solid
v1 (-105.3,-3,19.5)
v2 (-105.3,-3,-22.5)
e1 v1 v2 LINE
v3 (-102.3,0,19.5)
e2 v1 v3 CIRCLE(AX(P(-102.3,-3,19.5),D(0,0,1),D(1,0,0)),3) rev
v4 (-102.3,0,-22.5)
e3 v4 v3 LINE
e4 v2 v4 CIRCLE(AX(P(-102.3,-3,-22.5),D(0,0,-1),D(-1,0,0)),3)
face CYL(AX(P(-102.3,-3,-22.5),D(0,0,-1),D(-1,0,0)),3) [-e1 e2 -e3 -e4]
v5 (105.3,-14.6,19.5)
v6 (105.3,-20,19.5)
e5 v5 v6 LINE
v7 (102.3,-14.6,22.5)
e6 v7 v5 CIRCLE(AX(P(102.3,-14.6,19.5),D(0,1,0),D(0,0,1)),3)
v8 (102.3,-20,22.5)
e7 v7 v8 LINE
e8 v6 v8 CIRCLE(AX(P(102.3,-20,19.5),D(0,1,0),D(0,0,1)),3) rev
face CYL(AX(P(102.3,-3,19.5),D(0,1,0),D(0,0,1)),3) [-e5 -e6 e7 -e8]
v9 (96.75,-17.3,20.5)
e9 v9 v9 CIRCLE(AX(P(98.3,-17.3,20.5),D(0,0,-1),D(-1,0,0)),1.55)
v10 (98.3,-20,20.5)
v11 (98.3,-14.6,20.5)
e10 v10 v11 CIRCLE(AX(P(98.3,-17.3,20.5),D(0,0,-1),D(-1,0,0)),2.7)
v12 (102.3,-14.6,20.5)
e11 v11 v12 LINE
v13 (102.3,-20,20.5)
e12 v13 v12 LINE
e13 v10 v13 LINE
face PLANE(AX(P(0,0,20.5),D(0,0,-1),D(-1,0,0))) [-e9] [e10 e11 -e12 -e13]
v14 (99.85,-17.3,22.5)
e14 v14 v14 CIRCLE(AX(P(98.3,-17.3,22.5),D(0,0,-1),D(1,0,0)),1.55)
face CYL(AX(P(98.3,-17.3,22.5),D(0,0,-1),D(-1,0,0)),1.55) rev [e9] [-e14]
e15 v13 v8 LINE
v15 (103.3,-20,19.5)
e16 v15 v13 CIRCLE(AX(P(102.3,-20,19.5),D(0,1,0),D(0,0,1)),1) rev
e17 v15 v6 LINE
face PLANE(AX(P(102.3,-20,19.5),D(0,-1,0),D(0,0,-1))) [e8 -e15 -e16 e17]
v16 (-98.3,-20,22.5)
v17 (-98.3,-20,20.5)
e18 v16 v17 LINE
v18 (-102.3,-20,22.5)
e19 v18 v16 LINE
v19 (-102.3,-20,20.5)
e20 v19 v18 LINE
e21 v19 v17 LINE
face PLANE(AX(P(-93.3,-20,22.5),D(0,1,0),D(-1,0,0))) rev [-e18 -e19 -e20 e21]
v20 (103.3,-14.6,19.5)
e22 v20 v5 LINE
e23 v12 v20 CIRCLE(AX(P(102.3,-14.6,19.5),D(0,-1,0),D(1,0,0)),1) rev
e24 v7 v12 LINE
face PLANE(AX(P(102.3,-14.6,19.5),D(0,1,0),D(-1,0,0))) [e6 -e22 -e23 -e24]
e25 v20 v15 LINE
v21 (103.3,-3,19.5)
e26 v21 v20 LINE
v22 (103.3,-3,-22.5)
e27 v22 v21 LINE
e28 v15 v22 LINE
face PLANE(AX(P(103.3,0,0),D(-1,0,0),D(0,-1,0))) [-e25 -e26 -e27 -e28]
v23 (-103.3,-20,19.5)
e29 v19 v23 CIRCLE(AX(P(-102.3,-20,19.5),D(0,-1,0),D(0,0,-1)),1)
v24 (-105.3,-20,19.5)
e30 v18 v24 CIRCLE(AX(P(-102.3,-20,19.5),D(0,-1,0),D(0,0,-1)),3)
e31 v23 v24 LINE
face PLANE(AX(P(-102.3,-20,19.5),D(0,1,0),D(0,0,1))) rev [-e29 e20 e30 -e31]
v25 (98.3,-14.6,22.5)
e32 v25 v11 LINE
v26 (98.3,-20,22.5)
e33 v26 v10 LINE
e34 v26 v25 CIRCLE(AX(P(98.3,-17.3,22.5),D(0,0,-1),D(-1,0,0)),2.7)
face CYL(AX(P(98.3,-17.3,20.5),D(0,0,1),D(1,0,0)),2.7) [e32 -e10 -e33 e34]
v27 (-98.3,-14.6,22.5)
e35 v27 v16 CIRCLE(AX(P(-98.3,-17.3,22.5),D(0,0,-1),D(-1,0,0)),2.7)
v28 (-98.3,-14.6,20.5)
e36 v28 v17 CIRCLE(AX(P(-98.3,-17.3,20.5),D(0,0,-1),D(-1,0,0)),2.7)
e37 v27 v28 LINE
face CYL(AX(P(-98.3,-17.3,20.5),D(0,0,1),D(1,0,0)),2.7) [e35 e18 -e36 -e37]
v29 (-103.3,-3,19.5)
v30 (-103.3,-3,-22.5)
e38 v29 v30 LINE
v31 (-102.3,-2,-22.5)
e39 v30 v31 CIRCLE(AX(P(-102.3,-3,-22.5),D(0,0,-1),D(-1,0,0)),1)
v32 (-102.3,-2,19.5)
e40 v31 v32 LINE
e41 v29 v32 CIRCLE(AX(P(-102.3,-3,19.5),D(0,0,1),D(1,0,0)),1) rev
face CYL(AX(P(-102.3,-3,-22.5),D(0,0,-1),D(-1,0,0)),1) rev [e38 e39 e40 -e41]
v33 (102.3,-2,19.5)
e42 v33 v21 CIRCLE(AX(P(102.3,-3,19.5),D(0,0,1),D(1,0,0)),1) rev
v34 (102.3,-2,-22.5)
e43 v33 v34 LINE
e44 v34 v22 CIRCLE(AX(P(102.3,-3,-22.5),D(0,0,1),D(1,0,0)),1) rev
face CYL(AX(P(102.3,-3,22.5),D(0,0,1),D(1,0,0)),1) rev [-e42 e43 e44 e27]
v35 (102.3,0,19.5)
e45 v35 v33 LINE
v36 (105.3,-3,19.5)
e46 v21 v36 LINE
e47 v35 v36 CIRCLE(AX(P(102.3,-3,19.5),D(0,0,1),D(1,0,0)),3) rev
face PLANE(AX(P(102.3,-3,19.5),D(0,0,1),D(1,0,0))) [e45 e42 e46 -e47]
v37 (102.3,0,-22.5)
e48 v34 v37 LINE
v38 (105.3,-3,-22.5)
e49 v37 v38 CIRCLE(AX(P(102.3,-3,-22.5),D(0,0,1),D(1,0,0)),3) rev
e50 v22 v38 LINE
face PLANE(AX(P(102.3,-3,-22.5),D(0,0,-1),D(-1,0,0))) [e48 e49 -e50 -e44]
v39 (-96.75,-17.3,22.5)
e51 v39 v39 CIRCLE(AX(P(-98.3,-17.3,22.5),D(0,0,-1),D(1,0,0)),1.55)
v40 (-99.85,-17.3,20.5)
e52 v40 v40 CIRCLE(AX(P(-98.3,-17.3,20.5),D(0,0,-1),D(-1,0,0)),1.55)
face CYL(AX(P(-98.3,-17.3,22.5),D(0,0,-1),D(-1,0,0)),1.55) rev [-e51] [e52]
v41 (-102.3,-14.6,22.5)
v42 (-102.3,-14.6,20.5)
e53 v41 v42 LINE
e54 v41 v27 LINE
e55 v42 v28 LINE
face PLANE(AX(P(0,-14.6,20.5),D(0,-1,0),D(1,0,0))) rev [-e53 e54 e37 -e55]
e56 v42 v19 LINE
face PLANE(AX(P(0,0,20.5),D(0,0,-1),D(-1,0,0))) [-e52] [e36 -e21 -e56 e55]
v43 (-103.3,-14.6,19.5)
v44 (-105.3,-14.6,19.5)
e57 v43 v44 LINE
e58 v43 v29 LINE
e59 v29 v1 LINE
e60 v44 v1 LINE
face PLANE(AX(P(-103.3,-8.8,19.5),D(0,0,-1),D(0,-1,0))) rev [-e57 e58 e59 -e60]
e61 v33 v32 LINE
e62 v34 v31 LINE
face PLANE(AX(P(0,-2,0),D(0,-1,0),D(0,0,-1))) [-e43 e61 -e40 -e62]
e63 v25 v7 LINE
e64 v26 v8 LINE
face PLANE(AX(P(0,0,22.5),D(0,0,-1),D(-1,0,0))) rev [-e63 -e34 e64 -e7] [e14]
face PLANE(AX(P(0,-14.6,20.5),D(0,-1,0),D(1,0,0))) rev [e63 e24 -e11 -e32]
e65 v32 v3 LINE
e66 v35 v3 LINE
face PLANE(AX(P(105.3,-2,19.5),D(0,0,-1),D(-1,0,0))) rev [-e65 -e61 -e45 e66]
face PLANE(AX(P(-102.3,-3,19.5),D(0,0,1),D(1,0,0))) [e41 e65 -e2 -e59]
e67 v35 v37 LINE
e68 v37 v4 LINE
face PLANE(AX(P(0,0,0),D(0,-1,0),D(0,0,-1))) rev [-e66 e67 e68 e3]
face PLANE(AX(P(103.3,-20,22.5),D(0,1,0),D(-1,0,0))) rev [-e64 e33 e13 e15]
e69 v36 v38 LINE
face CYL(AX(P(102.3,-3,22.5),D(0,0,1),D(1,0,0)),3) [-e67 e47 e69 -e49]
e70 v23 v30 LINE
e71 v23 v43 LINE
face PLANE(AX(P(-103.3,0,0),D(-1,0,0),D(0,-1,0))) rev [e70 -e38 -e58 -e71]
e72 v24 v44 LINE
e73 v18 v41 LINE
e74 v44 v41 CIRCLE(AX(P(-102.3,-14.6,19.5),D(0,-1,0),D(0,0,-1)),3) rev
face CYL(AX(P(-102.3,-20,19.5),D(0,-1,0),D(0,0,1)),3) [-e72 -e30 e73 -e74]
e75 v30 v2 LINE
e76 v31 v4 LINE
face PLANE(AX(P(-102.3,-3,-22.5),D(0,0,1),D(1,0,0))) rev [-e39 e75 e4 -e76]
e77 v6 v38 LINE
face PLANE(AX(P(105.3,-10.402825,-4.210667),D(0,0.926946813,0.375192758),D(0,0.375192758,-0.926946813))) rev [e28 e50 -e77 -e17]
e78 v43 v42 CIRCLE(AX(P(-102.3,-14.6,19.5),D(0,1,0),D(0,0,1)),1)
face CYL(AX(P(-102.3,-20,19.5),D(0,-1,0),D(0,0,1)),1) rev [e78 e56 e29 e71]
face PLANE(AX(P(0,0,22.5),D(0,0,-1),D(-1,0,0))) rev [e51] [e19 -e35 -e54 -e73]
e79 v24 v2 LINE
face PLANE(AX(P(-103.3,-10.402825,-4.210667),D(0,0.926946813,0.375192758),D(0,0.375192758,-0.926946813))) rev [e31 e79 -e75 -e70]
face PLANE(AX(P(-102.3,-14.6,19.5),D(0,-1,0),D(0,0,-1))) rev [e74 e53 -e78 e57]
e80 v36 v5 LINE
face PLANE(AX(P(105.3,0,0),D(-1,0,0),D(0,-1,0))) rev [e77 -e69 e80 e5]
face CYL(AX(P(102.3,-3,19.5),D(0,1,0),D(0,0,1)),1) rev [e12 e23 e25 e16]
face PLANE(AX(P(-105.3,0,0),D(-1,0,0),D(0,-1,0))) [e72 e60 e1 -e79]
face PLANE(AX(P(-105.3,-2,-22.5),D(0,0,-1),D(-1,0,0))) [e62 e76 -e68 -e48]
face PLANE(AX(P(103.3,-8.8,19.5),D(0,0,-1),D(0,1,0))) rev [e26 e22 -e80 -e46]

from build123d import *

# Parameters (mm, degrees)
SKETCH1_W                          = 210.6
SKETCH1_H                          = 45
BASE_FLANGE1_DEPTH                 = 2
SM_EDGE_FLANGE_1_STRIP_W           = 10
SM_EDGE_FLANGE_1_STRIP_H           = 2
SM_EDGE_FLANGE_1_STRIP_CUT_DEPTH   = 45
SM_EDGE_FLANGE_1_STRIP_2_W         = 10
SM_EDGE_FLANGE_1_STRIP_2_H         = 2
SM_EDGE_FLANGE_1_STRIP_CUT_2_DEPTH = 45
SM_EDGE_FLANGE_1_DEPTH             = 45
SM_EDGE_FLANGE_1_BEND_DEPTH        = 45
SM_START                           = -20
SM_EDGE_FLANGE_2_DEPTH             = 20
SM_START_2                         = -3
SM_EDGE_FLANGE_2_2_DEPTH           = 3
SM_EDGE_FLANGE_2_3_DEPTH           = 17
SKETCH18_R                         = 1.55
CUT_EXTRUDE4_DEPTH                 = 10
CUT_EXTRUDE5_DEPTH                 = 213.740710726
CUT_EXTRUDE5_DEPTH_BACK            = 213.740710726
SKETCH22_W                         = 3
SKETCH22_H                         = 2
SKETCH22_H_2                       = 11.6


# Read off the part's stored shape, not the designer's step: Ребро-кромка2
# Sheet-metal steps are written as plain solids
with BuildPart() as part:
    # Sketch1 → Base-Flange1 (new body)
    with BuildSketch(Plane(origin=(0, 0, 0), x_dir=(1, 0, 0), z_dir=(0, 1, 0))):
        Rectangle(SKETCH1_W, SKETCH1_H)
    extrude(amount=-BASE_FLANGE1_DEPTH)

    # Ребро-кромка1 strip (across the edge) → Ребро-кромка1 strip cut (cut)
    with BuildSketch(Plane(origin=(-105.3, -2, 22.5), x_dir=(1, 0, 0), z_dir=(0, 0, -1))):
        with Locations((-2, -1)):
            Rectangle(SM_EDGE_FLANGE_1_STRIP_W, SM_EDGE_FLANGE_1_STRIP_H)
    extrude(amount=SM_EDGE_FLANGE_1_STRIP_CUT_DEPTH, mode=Mode.SUBTRACT)

    # Ребро-кромка1 strip 2 (across the edge) → Ребро-кромка1 strip cut 2 (cut)
    with BuildSketch(Plane(origin=(105.3, -2, -22.5), x_dir=(-1, 0, 0), z_dir=(0, 0, 1))):
        with Locations((-2, -1)):
            Rectangle(SM_EDGE_FLANGE_1_STRIP_2_W, SM_EDGE_FLANGE_1_STRIP_2_H)
    extrude(amount=SM_EDGE_FLANGE_1_STRIP_CUT_2_DEPTH, mode=Mode.SUBTRACT)

    # Ребро-кромка1 section (across the edge) → Ребро-кромка1 (add)
    with BuildSketch(Plane(origin=(-105.3, -2, 22.5), x_dir=(1, 0, 0), z_dir=(0, 0, -1))):
        with BuildLine():
            Line((0, 1), (0, 18))
            Line((0, 18), (2, 18))
            Line((2, 18), (2, 1))
            ThreePointArc((2, 1), (2.292893219, 0.292893219), (3, 0))
            Line((3, 0), (3, -2))
            ThreePointArc((3, -2), (0.878679656, -1.121320344), (0, 1))
        make_face()
    extrude(amount=SM_EDGE_FLANGE_1_DEPTH)

    # Ребро-кромка1 section 2 (across the edge) → Ребро-кромка1 bend (add)
    with BuildSketch(Plane(origin=(105.3, -2, -22.5), x_dir=(-1, 0, 0), z_dir=(0, 0, 1))):
        with BuildLine():
            Line((0, 1), (0, 18))
            Line((0, 18), (2, 18))
            Line((2, 18), (2, 1))
            ThreePointArc((2, 1), (2.292893219, 0.292893219), (3, 0))
            Line((3, 0), (3, -2))
            ThreePointArc((3, -2), (0.878679656, -1.121320344), (0, 1))
        make_face()
    extrude(amount=SM_EDGE_FLANGE_1_BEND_DEPTH)

    # Ребро-кромка2 outline → Ребро-кромка2 (cut)
    with BuildSketch(Plane(origin=(0, 0, 0), x_dir=(1, 0, 0), z_dir=(0, 1, 0)).offset(SM_START)):
        with BuildLine():
            Line((-102.3, -20.5), (-102.3, -19.5))
            Line((-102.3, -19.5), (-103.3, -19.5))
            ThreePointArc((-103.3, -19.5), (-103.007106781, -20.207106781), (-102.3, -20.5))
        make_face()
        with BuildLine():
            ThreePointArc((-102.3, -22.5), (-104.421320344, -21.621320344), (-105.3, -19.5))
            Line((-105.3, -19.5), (-105.3, -22.5))
            Line((-105.3, -22.5), (-102.3, -22.5))
        make_face()
        with BuildLine():
            Line((102.3, -22.5), (105.3, -22.5))
            Line((105.3, -22.5), (105.3, -19.5))
            ThreePointArc((105.3, -19.5), (104.421320344, -21.621320344), (102.3, -22.5))
        make_face()
        with BuildLine():
            Line((102.3, -19.5), (102.3, -20.5))
            ThreePointArc((102.3, -20.5), (103.007106781, -20.207106781), (103.3, -19.5))
            Line((103.3, -19.5), (102.3, -19.5))
        make_face()
    extrude(amount=SM_EDGE_FLANGE_2_DEPTH, mode=Mode.SUBTRACT)

    # Sm Edge Flange 2 2 outline → Sm Edge Flange 2 2 (cut)
    with BuildSketch(Plane(origin=(0, 0, 0), x_dir=(1, 0, 0), z_dir=(0, 1, 0)).offset(SM_START_2)):
        with BuildLine():
            Line((-102.3, -22.5), (-102.3, -20.5))
            ThreePointArc((-102.3, -20.5), (-103.007106781, -20.207106781), (-103.3, -19.5))
            Line((-103.3, -19.5), (-105.3, -19.5))
            ThreePointArc((-105.3, -19.5), (-104.421320344, -21.621320344), (-102.3, -22.5))
        make_face()
        with BuildLine():
            Line((102.3, -20.5), (102.3, -22.5))
            ThreePointArc((102.3, -22.5), (104.421320344, -21.621320344), (105.3, -19.5))
            Line((105.3, -19.5), (103.3, -19.5))
            ThreePointArc((103.3, -19.5), (103.007106781, -20.207106781), (102.3, -20.5))
        make_face()
    extrude(amount=SM_EDGE_FLANGE_2_2_DEPTH, mode=Mode.SUBTRACT)

    # Sm Edge Flange 2 3 outline → Sm Edge Flange 2 3 (add)
    with BuildSketch(Plane(origin=(0, 0, 0), x_dir=(1, 0, 0), z_dir=(0, 1, 0)).offset(SM_START)):
        with BuildLine():
            Line((93.3, -20.5), (93.3, -22.5))
            Line((93.3, -22.5), (102.3, -22.5))
            ThreePointArc((102.3, -22.5), (102.807305936, -22.456795679), (103.3, -22.328427125))
            Line((103.3, -22.328427125), (103.3, -19.5))
            ThreePointArc((103.3, -19.5), (103.007106781, -20.207106781), (102.3, -20.5))
            Line((102.3, -20.5), (93.3, -20.5))
        make_face()
        with BuildLine():
            Line((-93.3, -20.5), (-102.3, -20.5))
            ThreePointArc((-102.3, -20.5), (-103.007106781, -20.207106781), (-103.3, -19.5))
            Line((-103.3, -19.5), (-103.3, -22.328427125))
            ThreePointArc((-103.3, -22.328427125), (-102.807305936, -22.456795679), (-102.3, -22.5))
            Line((-102.3, -22.5), (-93.3, -22.5))
            Line((-93.3, -22.5), (-93.3, -20.5))
        make_face()
    extrude(amount=SM_EDGE_FLANGE_2_3_DEPTH)

    # Sketch18 → Cut-Extrude4 (cut)
    with BuildSketch(Plane(origin=(0, 0, 20.5), x_dir=(-1, 0, 0), z_dir=(0, 0, -1))):
        with Locations((-98.3, -17.3)):
            Circle(SKETCH18_R)
        with Locations((98.3, -17.3)):
            Circle(SKETCH18_R)
        with BuildLine():
            Line((-93.3, -2), (-102.3, -2))
            Line((-102.3, -2), (-102.3, -14.6))
            Line((-102.3, -14.6), (-98.3, -14.6))
            ThreePointArc((-98.3, -14.6), (-95.6, -17.3), (-98.3, -20))
            Line((-98.3, -20), (-93.3, -20))
            Line((-93.3, -20), (-93.3, -14.6))
            Line((-93.3, -14.6), (-93.3, -2))
        make_face()
        with BuildLine():
            Line((93.3, -14.6), (93.3, -20))
            Line((93.3, -20), (98.3, -20))
            ThreePointArc((98.3, -20), (95.6, -17.3), (98.3, -14.6))
            Line((98.3, -14.6), (102.3, -14.6))
            Line((102.3, -14.6), (102.3, -2))
            Line((102.3, -2), (93.3, -2))
            Line((93.3, -2), (93.3, -14.6))
        make_face()
    extrude(amount=-CUT_EXTRUDE4_DEPTH, mode=Mode.SUBTRACT)

    # Sketch22 → Cut-Extrude5 (cut, two sides: drawn at the far end of the back side and taken through both)
    with BuildSketch(Plane.ZY.offset(105.3).offset(-CUT_EXTRUDE5_DEPTH_BACK)):
        with Locations((21, -1)):
            Rectangle(SKETCH22_W, SKETCH22_H)
        Polygon((-22.5, -3), (19.5, -20), (-22.5, -20), align=None)
        with Locations((21, -8.8)):
            Rectangle(SKETCH22_W, SKETCH22_H_2)
    extrude(amount=CUT_EXTRUDE5_DEPTH + CUT_EXTRUDE5_DEPTH_BACK, mode=Mode.SUBTRACT)


solid = part.part
